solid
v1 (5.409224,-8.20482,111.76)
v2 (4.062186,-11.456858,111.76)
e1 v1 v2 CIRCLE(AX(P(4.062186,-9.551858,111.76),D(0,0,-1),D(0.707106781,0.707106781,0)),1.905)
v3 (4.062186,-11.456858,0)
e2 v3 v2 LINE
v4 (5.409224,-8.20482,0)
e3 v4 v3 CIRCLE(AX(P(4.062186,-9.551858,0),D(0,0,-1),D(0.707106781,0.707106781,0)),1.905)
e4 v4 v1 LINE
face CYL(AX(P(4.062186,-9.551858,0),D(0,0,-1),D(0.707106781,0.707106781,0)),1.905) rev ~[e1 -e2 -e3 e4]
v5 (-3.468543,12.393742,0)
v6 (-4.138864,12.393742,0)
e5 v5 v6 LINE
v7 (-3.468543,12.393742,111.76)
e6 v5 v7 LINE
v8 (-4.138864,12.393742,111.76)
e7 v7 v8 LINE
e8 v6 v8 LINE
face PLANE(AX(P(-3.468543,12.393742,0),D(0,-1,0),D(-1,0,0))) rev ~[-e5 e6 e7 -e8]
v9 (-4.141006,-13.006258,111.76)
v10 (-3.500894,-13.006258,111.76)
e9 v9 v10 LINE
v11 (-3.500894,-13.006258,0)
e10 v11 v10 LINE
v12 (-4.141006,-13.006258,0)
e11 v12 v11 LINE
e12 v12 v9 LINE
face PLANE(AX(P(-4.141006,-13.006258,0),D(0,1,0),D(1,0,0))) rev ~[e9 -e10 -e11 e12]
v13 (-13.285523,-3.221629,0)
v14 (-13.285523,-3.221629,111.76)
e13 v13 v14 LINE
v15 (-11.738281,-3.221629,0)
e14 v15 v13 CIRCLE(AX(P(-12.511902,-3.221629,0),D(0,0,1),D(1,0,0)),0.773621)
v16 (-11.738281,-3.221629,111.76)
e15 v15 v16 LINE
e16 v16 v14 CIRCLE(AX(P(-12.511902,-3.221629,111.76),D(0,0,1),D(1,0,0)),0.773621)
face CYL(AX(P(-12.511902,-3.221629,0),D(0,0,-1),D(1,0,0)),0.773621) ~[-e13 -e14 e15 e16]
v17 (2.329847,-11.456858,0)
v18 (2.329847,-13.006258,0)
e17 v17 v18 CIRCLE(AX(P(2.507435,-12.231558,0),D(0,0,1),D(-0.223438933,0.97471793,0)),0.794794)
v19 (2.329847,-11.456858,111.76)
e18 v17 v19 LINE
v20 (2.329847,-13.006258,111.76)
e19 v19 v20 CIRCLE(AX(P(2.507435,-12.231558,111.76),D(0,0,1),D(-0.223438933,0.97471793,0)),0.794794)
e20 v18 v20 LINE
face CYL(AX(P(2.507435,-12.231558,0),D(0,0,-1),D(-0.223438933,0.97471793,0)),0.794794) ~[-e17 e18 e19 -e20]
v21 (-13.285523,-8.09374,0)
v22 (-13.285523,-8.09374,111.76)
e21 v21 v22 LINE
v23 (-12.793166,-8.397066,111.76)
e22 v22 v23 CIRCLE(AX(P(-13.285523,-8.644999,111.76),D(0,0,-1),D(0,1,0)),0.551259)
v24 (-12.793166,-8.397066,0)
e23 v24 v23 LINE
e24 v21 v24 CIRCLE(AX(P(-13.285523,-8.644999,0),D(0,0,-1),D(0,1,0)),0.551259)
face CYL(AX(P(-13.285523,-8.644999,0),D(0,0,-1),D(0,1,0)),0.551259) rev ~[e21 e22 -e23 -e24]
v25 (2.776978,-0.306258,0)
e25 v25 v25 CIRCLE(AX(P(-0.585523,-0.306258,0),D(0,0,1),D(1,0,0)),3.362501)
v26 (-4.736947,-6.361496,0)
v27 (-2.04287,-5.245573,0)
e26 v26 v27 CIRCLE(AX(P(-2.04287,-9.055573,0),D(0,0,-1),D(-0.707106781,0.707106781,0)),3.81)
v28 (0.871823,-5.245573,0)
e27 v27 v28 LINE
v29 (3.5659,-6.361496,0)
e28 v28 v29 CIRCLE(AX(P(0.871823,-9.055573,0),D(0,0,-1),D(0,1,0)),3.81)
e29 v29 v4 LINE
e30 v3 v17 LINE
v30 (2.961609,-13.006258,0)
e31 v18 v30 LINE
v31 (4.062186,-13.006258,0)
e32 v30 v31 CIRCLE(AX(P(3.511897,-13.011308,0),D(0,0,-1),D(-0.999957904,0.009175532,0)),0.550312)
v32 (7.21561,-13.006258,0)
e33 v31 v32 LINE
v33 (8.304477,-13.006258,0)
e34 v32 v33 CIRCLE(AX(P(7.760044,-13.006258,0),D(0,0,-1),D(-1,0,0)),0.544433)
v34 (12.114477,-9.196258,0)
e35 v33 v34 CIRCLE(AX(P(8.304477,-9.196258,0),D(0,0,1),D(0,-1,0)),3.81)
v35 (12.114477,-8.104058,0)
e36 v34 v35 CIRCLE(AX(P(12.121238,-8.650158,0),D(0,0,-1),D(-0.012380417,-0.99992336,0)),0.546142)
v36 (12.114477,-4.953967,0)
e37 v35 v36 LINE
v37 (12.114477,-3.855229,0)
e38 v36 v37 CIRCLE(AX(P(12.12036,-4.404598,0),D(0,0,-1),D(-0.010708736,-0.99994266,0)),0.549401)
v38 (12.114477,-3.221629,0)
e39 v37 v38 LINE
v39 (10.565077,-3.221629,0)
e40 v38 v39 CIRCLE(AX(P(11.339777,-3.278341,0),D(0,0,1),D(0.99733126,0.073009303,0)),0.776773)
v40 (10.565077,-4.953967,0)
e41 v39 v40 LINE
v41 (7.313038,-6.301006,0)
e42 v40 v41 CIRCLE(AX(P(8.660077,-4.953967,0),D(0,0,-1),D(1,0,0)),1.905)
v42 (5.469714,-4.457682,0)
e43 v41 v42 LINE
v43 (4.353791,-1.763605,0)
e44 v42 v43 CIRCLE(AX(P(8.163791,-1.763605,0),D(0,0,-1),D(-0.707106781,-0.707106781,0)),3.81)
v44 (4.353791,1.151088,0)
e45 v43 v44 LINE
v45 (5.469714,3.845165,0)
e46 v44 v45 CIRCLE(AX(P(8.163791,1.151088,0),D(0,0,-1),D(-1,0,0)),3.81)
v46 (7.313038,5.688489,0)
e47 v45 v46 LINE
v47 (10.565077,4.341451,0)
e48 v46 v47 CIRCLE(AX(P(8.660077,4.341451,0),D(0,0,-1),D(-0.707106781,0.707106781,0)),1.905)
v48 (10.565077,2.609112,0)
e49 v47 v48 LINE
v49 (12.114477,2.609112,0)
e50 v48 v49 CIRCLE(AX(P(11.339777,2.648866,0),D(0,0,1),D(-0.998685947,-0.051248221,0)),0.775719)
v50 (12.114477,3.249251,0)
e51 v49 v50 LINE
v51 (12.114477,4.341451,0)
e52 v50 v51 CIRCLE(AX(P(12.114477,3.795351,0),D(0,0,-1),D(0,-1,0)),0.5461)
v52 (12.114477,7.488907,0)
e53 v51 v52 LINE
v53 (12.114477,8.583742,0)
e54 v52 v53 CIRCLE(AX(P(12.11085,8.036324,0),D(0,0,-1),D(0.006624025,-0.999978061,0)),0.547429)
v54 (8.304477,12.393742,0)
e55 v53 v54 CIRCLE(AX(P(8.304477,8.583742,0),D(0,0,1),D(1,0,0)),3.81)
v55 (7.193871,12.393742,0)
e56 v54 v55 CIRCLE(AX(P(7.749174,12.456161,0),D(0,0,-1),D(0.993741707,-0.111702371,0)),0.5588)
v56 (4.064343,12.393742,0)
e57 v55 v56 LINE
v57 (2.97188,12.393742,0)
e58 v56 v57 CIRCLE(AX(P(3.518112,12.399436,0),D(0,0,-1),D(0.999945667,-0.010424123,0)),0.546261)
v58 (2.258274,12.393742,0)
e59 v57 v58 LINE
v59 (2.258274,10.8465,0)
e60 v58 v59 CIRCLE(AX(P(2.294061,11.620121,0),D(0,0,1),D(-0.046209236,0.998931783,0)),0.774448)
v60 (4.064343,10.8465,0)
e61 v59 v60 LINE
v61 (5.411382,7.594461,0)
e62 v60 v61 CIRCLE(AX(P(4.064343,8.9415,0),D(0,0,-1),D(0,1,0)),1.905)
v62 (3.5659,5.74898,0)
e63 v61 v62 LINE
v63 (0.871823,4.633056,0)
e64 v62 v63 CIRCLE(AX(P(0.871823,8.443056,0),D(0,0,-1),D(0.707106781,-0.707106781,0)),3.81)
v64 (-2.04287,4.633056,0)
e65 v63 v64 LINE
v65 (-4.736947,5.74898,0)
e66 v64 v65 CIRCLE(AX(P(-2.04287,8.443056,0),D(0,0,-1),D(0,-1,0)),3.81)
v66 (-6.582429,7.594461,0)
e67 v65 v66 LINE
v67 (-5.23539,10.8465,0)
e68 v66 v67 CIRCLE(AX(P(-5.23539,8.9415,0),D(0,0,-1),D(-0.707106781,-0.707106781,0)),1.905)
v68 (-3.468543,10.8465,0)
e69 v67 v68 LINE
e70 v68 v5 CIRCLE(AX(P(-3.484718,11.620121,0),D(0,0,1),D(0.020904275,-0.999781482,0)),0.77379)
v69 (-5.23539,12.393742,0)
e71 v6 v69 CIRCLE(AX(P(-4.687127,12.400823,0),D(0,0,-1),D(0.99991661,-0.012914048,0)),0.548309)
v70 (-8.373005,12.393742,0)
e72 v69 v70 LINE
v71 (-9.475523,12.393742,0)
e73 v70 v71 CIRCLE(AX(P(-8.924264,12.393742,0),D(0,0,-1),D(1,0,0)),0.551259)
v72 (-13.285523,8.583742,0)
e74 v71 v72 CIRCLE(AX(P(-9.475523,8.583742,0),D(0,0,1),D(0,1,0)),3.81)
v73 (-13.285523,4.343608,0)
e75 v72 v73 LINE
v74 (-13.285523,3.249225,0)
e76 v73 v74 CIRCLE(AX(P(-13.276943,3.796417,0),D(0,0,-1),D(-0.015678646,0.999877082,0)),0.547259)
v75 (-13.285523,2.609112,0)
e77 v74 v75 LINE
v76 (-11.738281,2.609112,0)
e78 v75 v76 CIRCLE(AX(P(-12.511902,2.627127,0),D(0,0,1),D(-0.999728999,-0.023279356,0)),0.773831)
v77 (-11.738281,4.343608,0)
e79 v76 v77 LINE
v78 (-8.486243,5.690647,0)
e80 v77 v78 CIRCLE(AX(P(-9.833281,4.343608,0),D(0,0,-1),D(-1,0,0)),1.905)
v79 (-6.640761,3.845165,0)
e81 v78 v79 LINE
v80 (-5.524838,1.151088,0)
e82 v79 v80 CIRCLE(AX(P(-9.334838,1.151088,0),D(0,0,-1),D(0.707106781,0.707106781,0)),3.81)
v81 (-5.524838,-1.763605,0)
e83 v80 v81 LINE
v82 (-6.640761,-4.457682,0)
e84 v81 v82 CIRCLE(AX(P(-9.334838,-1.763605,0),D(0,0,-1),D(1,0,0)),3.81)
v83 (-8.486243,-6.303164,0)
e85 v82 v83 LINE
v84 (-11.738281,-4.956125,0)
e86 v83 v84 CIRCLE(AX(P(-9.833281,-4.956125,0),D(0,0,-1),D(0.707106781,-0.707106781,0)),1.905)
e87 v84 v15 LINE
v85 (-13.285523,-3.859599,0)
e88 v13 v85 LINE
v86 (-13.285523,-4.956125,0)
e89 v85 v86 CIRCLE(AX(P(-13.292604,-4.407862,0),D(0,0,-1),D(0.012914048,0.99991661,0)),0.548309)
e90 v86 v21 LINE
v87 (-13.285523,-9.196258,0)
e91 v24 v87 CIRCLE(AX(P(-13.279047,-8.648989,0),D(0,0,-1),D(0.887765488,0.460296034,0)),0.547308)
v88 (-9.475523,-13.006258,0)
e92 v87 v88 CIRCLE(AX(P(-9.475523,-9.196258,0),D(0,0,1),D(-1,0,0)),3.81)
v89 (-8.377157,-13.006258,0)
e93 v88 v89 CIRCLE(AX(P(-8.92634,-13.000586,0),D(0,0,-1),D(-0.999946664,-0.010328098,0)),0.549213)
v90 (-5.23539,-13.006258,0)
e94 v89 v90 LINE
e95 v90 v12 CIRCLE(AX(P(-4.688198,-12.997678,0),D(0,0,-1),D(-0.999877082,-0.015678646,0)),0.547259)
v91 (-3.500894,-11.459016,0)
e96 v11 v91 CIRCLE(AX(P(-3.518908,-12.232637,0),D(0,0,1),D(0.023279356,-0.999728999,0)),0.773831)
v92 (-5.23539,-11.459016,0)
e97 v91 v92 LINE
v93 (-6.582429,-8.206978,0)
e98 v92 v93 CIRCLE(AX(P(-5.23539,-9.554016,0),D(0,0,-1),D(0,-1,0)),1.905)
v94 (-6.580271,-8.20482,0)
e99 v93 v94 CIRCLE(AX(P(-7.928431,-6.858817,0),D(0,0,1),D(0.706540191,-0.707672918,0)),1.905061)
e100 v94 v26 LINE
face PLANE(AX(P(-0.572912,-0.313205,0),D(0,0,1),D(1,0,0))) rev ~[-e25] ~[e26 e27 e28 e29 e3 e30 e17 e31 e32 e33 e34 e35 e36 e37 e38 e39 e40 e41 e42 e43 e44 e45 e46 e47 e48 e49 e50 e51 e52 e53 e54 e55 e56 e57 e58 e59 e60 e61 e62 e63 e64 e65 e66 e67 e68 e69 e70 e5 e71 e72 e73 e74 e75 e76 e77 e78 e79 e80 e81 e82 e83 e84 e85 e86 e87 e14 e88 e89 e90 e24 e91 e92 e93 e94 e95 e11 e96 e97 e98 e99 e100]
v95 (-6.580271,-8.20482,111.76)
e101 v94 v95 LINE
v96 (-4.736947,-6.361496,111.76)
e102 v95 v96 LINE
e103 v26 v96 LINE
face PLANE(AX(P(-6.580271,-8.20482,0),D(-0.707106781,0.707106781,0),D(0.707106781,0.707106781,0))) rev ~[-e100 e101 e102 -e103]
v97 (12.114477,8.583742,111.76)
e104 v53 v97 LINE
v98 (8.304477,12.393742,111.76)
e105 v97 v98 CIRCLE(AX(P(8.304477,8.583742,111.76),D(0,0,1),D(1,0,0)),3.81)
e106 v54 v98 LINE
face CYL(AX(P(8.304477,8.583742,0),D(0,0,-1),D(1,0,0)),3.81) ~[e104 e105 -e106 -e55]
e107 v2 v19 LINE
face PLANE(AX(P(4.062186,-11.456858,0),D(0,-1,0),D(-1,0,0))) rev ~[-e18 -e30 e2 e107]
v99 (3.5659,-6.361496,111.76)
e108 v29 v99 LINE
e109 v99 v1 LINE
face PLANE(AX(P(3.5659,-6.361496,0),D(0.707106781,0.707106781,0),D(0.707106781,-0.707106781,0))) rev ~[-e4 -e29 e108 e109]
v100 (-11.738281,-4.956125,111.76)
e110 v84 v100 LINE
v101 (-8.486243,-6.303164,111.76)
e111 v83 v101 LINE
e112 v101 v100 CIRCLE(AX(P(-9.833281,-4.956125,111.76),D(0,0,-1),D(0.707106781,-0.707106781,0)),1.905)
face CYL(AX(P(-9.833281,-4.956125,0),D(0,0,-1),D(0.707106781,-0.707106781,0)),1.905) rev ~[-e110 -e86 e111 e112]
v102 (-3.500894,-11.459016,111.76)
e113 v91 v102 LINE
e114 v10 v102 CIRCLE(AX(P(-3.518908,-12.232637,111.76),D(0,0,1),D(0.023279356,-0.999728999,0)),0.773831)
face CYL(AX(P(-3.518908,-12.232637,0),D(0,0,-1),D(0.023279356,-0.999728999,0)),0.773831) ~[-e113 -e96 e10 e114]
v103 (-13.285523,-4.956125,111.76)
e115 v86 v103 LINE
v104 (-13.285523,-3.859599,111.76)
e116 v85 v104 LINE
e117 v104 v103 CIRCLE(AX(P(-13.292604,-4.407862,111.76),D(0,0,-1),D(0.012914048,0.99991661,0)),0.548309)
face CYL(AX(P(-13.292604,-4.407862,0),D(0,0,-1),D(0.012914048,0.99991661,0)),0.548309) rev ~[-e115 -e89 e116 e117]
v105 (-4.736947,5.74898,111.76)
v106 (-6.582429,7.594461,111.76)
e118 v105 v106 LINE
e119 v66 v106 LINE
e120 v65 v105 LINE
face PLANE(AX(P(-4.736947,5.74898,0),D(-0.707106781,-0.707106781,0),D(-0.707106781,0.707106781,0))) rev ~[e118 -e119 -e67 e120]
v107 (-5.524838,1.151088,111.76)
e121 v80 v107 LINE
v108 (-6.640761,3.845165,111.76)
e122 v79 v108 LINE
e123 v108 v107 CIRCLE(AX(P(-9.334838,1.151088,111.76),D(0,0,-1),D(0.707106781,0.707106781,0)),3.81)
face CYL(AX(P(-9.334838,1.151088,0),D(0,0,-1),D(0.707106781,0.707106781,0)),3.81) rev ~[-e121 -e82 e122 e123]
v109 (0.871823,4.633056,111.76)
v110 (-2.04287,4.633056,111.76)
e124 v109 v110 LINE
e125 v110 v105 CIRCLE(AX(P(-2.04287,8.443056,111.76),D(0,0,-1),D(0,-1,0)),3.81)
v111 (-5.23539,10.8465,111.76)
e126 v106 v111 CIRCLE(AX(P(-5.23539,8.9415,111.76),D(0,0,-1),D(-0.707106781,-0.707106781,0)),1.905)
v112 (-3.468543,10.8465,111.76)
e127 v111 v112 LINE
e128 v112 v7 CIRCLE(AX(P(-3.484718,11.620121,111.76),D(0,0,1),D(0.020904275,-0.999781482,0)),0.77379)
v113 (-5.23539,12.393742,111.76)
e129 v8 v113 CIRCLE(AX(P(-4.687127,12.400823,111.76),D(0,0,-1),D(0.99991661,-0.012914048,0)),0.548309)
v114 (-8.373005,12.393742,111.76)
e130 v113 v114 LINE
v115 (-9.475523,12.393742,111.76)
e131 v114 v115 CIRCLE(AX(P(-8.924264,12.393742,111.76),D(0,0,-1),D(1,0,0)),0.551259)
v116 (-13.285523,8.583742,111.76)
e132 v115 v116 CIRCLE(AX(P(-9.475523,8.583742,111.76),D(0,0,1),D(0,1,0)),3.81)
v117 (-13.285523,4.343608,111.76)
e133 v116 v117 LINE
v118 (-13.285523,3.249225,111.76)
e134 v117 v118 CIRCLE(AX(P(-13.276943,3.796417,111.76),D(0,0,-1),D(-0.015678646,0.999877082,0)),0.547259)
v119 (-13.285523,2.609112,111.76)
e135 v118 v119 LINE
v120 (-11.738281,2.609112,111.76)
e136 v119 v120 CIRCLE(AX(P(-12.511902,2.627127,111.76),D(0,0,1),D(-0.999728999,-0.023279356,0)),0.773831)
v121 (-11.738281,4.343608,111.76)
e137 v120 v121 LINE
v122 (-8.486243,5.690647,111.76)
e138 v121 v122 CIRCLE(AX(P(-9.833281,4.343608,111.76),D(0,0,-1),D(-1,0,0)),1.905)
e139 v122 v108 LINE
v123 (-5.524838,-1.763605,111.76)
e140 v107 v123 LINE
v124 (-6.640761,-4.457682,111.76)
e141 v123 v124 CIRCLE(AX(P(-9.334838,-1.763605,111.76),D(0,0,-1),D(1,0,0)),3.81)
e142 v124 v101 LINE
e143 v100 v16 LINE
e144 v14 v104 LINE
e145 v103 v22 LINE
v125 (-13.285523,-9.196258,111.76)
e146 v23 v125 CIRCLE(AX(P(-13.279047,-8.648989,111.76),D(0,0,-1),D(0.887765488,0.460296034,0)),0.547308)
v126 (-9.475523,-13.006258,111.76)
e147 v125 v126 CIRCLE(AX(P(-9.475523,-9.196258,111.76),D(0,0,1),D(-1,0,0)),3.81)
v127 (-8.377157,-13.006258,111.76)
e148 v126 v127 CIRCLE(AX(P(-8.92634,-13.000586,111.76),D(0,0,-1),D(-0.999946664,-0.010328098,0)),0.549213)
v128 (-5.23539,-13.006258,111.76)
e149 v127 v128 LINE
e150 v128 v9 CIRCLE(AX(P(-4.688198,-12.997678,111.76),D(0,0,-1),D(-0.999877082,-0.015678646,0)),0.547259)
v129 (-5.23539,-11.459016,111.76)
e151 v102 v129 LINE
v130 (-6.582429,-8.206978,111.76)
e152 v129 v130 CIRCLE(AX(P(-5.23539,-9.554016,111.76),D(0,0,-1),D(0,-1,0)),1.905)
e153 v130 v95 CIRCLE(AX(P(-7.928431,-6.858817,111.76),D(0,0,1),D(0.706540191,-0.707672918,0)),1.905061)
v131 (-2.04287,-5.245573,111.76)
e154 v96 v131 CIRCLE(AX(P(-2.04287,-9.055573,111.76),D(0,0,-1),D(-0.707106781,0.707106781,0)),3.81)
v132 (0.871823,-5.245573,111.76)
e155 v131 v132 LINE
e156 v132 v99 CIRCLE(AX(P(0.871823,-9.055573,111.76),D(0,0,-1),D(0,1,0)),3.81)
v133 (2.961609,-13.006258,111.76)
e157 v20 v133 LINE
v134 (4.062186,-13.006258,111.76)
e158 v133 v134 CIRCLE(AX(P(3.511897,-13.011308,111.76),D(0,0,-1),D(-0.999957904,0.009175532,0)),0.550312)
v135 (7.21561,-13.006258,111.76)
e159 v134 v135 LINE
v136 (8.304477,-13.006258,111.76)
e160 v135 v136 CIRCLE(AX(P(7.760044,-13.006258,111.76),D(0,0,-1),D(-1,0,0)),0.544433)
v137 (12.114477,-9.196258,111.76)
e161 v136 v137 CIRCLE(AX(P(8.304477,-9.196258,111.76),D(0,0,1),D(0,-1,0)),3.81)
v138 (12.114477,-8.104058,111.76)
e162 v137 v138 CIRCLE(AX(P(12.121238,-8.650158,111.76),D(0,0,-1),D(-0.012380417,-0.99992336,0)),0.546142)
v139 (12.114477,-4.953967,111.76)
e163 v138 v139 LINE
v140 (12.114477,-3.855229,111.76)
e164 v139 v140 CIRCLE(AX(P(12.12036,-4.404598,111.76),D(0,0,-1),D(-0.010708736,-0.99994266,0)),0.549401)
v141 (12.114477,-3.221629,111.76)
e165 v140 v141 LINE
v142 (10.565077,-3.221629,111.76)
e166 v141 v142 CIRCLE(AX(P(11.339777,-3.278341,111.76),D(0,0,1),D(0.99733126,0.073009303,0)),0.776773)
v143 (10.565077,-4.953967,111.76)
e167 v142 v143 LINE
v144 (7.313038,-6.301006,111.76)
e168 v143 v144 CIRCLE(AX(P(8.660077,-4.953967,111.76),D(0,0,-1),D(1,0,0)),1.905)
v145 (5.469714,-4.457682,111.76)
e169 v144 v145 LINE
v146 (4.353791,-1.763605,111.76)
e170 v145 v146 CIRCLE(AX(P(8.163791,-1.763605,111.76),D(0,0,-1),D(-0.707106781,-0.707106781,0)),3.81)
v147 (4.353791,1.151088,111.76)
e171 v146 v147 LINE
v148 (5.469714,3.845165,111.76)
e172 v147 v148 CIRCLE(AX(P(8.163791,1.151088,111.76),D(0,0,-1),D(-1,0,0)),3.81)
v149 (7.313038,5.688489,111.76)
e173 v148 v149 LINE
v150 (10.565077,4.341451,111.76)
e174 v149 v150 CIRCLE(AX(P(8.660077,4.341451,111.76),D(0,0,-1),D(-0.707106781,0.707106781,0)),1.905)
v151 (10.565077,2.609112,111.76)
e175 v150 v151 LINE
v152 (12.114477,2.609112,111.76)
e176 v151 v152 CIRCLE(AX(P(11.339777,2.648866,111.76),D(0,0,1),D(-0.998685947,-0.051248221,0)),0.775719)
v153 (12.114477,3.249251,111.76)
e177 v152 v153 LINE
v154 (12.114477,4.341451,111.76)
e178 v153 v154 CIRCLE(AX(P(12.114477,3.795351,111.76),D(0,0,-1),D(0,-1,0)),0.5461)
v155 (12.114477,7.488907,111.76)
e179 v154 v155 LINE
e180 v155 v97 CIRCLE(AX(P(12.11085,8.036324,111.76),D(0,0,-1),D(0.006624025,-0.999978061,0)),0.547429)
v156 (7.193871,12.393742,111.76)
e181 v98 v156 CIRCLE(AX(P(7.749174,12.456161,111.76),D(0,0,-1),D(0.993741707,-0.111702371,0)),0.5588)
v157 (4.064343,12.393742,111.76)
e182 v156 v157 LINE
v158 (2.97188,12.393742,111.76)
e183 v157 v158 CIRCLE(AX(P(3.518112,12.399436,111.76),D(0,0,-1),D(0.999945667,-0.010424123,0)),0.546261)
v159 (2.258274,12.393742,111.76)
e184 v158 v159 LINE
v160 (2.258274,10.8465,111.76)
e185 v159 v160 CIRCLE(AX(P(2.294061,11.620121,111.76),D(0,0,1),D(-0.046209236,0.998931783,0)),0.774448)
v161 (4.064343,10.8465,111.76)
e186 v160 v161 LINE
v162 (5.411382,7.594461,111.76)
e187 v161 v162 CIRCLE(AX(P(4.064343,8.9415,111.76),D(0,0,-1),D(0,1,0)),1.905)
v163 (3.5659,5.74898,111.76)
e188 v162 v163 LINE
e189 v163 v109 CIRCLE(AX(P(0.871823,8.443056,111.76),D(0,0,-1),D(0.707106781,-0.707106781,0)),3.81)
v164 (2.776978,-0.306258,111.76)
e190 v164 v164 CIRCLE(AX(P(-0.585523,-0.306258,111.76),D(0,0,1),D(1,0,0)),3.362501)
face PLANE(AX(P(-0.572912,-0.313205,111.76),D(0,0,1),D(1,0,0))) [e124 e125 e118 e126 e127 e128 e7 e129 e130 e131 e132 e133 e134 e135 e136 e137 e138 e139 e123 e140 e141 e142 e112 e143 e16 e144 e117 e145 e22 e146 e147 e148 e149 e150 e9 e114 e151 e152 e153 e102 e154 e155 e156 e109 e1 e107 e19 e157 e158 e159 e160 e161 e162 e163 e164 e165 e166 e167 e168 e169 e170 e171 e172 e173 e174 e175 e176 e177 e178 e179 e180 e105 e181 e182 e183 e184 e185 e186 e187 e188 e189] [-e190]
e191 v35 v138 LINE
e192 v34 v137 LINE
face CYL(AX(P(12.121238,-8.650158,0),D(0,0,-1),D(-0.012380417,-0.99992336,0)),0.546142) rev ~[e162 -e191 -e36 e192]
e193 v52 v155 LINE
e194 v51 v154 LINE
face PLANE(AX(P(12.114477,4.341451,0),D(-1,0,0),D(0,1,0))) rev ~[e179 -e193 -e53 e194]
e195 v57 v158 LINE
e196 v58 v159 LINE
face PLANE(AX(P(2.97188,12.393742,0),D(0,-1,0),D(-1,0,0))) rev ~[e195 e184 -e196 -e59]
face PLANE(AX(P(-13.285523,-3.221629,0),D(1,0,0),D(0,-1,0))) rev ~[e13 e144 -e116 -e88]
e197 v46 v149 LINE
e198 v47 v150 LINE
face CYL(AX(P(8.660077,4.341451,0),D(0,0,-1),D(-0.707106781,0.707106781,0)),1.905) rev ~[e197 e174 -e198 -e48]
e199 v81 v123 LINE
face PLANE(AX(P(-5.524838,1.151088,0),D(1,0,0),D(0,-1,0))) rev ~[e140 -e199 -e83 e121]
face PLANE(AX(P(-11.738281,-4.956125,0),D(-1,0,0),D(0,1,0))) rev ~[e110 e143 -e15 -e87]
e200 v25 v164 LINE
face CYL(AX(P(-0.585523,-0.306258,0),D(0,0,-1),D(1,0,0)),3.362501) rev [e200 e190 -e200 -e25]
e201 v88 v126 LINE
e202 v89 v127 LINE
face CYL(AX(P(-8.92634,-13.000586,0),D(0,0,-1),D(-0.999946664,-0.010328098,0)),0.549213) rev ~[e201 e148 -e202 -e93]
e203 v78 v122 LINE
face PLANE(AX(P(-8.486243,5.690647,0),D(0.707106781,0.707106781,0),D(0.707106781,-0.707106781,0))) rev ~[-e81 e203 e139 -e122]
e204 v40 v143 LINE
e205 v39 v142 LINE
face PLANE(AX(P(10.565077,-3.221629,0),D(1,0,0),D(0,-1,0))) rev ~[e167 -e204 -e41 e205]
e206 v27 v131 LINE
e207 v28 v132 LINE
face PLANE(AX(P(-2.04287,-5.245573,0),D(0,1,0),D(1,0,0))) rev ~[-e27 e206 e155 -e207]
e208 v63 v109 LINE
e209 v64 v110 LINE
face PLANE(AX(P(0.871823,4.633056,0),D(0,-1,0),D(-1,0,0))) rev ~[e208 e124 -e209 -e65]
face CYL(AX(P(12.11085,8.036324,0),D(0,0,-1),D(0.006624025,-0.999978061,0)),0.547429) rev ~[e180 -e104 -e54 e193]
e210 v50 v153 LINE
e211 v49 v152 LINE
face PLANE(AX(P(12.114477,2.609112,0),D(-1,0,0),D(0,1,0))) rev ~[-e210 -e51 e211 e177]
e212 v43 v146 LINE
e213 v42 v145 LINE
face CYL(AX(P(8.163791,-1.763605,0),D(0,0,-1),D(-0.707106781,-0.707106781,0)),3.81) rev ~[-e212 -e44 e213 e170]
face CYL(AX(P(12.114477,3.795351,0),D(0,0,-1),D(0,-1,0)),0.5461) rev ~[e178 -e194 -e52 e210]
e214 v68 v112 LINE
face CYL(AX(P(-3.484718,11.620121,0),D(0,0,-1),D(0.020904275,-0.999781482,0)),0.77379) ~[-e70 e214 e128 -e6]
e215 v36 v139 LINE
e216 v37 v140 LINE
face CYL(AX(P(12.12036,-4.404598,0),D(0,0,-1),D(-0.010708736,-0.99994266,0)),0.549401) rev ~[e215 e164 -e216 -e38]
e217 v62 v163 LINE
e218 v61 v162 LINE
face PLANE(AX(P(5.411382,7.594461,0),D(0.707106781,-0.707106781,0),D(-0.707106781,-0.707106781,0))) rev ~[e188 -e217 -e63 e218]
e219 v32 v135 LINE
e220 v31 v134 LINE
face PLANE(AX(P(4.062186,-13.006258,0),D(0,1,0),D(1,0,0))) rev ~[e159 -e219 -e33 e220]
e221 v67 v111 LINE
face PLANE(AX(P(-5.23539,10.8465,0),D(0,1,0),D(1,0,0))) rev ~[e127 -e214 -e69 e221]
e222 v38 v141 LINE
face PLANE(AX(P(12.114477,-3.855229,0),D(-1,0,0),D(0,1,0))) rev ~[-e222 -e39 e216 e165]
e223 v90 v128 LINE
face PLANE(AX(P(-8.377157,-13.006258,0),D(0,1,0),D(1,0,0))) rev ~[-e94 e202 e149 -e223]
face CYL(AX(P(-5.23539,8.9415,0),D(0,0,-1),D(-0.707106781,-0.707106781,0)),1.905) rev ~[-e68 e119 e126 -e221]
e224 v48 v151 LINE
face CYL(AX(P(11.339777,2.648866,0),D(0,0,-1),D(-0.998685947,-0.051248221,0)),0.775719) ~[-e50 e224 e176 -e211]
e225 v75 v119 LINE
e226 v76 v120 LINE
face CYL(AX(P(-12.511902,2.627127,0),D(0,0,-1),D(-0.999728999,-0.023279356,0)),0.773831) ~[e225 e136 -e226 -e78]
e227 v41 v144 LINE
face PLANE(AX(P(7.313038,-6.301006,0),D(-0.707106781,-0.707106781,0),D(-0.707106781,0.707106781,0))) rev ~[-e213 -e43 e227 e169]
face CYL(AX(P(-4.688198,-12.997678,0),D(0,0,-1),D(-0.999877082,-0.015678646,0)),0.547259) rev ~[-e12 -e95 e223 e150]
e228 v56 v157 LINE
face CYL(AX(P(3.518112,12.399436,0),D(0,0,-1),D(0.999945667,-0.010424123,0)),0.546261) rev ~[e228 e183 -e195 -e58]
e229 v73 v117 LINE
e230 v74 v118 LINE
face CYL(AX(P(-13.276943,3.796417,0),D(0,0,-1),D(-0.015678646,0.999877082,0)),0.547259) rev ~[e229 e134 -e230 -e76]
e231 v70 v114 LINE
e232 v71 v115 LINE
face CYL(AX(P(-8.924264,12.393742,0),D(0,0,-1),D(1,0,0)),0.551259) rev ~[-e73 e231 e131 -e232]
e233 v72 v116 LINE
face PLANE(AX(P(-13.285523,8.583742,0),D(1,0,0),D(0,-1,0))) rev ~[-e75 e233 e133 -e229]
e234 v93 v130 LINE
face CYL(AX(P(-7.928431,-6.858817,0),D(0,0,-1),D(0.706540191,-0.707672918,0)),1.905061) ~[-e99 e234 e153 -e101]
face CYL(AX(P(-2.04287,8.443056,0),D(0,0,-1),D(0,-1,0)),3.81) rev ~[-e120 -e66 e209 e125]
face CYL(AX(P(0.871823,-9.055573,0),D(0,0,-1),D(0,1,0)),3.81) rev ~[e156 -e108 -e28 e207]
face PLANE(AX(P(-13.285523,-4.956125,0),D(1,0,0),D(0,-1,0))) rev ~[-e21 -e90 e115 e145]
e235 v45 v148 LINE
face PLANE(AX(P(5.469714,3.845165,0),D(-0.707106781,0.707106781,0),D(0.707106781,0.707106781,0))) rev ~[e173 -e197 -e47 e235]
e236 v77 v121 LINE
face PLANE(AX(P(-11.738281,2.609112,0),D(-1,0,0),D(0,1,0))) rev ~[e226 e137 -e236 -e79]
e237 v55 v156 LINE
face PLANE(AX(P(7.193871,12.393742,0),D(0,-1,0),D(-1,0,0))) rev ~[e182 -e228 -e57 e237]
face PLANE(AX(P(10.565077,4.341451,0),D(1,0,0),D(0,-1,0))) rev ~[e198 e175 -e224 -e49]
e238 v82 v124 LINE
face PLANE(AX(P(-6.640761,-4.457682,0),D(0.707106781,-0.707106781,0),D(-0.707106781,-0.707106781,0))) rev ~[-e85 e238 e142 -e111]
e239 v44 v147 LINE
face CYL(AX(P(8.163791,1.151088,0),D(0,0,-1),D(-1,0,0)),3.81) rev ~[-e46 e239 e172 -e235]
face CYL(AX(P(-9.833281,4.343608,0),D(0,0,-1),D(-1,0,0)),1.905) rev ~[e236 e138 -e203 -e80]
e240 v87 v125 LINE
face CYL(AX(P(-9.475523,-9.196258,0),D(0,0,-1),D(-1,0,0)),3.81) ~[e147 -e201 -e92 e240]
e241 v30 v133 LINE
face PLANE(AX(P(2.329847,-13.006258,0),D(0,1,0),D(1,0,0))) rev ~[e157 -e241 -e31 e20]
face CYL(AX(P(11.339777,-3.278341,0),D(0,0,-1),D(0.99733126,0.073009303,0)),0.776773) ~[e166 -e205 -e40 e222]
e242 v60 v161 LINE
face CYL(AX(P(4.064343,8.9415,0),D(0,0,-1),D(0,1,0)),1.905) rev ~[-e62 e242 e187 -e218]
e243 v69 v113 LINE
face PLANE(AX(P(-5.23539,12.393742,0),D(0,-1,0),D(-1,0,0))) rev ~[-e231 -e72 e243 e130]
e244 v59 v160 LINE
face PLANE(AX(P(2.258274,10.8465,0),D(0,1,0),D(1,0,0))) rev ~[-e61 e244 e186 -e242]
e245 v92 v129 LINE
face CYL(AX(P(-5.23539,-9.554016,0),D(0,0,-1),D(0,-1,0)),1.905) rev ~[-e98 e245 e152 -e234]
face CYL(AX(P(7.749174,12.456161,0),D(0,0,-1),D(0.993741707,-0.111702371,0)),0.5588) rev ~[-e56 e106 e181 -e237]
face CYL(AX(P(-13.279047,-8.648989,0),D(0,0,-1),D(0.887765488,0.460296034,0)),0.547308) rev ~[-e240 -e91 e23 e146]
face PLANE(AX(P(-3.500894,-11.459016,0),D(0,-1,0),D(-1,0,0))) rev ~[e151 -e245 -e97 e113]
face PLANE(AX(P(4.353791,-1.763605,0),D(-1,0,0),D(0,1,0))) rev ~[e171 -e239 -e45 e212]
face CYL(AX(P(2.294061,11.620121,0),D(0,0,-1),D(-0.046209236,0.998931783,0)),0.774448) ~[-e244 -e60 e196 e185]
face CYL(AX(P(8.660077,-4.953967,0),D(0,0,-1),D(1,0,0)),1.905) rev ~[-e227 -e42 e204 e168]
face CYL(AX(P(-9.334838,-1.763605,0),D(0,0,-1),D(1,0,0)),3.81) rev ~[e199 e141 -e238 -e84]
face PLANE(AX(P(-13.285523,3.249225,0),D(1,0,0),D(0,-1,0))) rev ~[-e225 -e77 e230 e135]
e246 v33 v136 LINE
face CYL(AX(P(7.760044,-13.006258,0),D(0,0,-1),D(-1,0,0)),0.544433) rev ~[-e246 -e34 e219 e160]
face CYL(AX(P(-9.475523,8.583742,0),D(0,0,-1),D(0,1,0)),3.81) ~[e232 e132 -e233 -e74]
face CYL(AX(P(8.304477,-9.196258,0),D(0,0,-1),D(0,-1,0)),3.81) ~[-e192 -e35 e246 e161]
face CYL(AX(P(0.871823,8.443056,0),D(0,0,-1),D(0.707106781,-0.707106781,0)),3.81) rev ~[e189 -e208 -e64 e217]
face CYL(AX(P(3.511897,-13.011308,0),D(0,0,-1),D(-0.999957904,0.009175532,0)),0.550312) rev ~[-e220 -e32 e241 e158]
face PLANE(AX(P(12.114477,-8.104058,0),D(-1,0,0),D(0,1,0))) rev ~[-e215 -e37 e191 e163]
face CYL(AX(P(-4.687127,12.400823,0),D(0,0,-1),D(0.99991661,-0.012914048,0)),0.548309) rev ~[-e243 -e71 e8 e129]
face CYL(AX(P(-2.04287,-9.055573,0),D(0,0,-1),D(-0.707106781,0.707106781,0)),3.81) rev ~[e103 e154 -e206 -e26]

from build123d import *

# Parameters (mm, degrees)
F0_R     = 3.3625011168
F1_DEPTH = 111.76


# Not quite as in the source:
# - ends of sketch curves that miss each other by under 0.0002 mm in the source are joined


with BuildPart() as f1:
    # F0 (on Top) → F1 (new body)
    with BuildSketch(Plane.XY):
        with BuildLine():
            ThreePointArc((3.5659002011, 5.7489795053), (2.3298472421, 4.9230753228), (0.8718233648, 4.6330563417))
            Line((0.8718233648, 4.6330563417), (-2.0428700475, 4.6330563417))
            ThreePointArc((-2.0428700475, 4.6330563417), (-3.5008939248, 4.9230753228), (-4.7369468838, 5.7489795053))
            Line((-4.7369468838, 5.7489795053), (-6.5824285393, 7.5944611609))
            ThreePointArc((-6.5824285393, 7.5944611609), (-6.9953806306, 9.6705115177), (-5.2353901211, 10.846499579))
            Line((-5.2353901211, 10.846499579), (-3.5008939248, 10.846499579))
            Line((-3.5008939248, 10.846499579), (-3.4685428807, 10.846499579))
            ThreePointArc((-3.4685428807, 10.846499579), (-2.7109282724, 11.6201206221), (-3.4685428807, 12.3937416652))
            Line((-3.4685428807, 12.3937416652), (-3.5008939248, 12.3937416652))
            Line((-3.5008939248, 12.3937416652), (-4.1388643307, 12.3937416652))
            ThreePointArc((-4.1388643307, 12.3937416652), (-4.6871272259, 11.8525139305), (-5.2353901211, 12.3937416652))
            Line((-5.2353901211, 12.3937416652), (-8.3730050695, 12.3937416652))
            ThreePointArc((-8.3730050695, 12.3937416652), (-8.9242642054, 11.8424825293), (-9.4755233413, 12.3937416652))
            ThreePointArc((-9.4755233413, 12.3937416652), (-12.1696001777, 11.2778185015), (-13.2855233413, 8.5837416652))
            Line((-13.2855233413, 8.5837416652), (-13.2855233413, 7.4984658996))
            Line((-13.2855233413, 7.4984658996), (-13.2855233413, 4.343608445))
            ThreePointArc((-13.2855233413, 4.343608445), (-12.7296839168, 3.7964165708), (-13.2855233413, 3.2492246965))
            Line((-13.2855233413, 3.2492246965), (-13.2855233413, 2.6091122487))
            ThreePointArc((-13.2855233413, 2.6091122487), (-12.5119022982, 1.8532957784), (-11.7382812551, 2.6091122487))
            Line((-11.7382812551, 2.6091122487), (-11.7382812551, 4.343608445))
            ThreePointArc((-11.7382812551, 4.343608445), (-10.5622931938, 6.1035989545), (-8.486242837, 5.6906468632))
            Line((-8.486242837, 5.6906468632), (-6.6407611815, 3.8451652077))
            ThreePointArc((-6.6407611815, 3.8451652077), (-5.8148569989, 2.6091122487), (-5.5248380178, 1.1510883714))
            Line((-5.5248380178, 1.1510883714), (-5.5248380178, -1.7636050409))
            ThreePointArc((-5.5248380178, -1.7636050409), (-5.8148569989, -3.2216289182), (-6.6407611815, -4.4576818772))
            Line((-6.6407611815, -4.4576818772), (-8.486242837, -6.3031635328))
            ThreePointArc((-8.486242837, -6.3031635328), (-10.5622931938, -6.716115624), (-11.7382812551, -4.9561251146))
            Line((-11.7382812551, -4.9561251146), (-11.7382812551, -3.2216289182))
            ThreePointArc((-11.7382812551, -3.2216289182), (-12.5119022982, -2.4480078751), (-13.2855233413, -3.2216289182))
            Line((-13.2855233413, -3.2216289182), (-13.2855233413, -3.8570189362))
            Line((-13.2855233413, -3.8570189362), (-13.2855233413, -3.8595993241))
            ThreePointArc((-13.2855233413, -3.8595993241), (-12.7442956066, -4.4078622194), (-13.2855233413, -4.9561251146))
            Line((-13.2855233413, -4.9561251146), (-13.2855233413, -8.093740063))
            ThreePointArc((-13.2855233413, -8.093740063), (-12.9963771793, -8.175658031), (-12.7931661592, -8.3970656592))
            ThreePointArc((-12.7931661592, -8.3970656592), (-12.8130701183, -8.9360625991), (-13.2855233413, -9.1962583348))
            ThreePointArc((-13.2855233413, -9.1962583348), (-12.1696001777, -11.8903351711), (-9.4755233413, -13.0062583348))
            ThreePointArc((-9.4755233413, -13.0062583348), (-8.9263401234, -12.4513735034), (-8.3771569056, -13.0062583348))
            Line((-8.3771569056, -13.0062583348), (-5.2353901211, -13.0062583348))
            ThreePointArc((-5.2353901211, -13.0062583348), (-4.6881982469, -12.4504189103), (-4.1410063726, -13.0062583348))
            Line((-4.1410063726, -13.0062583348), (-3.5008939248, -13.0062583348))
            ThreePointArc((-3.5008939248, -13.0062583348), (-2.7450774545, -12.2326372917), (-3.5008939248, -11.4590162486))
            Line((-3.5008939248, -11.4590162486), (-5.2353901211, -11.4590162486))
            ThreePointArc((-5.2353901211, -11.4590162486), (-6.9953806306, -10.2830281872), (-6.5824285393, -8.2069778304))
            ThreePointArc((-6.5824285393, -8.2069778304), (-6.5813491493, -8.2058993046), (-6.5802706255, -8.2048199166))
            Line((-6.5802706255, -8.2048199166), (-4.7369468838, -6.3614961749))
            ThreePointArc((-4.7369468838, -6.3614961749), (-3.5008939248, -5.5355919924), (-2.0428700475, -5.2455730112))
            Line((-2.0428700475, -5.2455730112), (0.8718233648, -5.2455730112))
            ThreePointArc((0.8718233648, -5.2455730112), (2.3298472421, -5.5355919924), (3.5659002011, -6.3614961749))
            Line((3.5659002011, -6.3614961749), (5.4092239428, -8.2048199166))
            ThreePointArc((5.4092239428, -8.2048199166), (5.8221760341, -10.2808702734), (4.0621855247, -11.4568583348))
            Line((4.0621855247, -11.4568583348), (2.3298472421, -11.4568583348))
            ThreePointArc((2.3298472421, -11.4568583348), (1.7126411358, -12.2315583348), (2.3298472421, -13.0062583348))
            Line((2.3298472421, -13.0062583348), (2.9616088274, -13.0062583348))
            ThreePointArc((2.9616088274, -13.0062583348), (3.511897176, -12.460996221), (4.0621855247, -13.0062583348))
            Line((4.0621855247, -13.0062583348), (7.2156104858, -13.0062583348))
            ThreePointArc((7.2156104858, -13.0062583348), (7.7600435722, -12.4618252483), (8.3044766587, -13.0062583348))
            ThreePointArc((8.3044766587, -13.0062583348), (10.998553495, -11.8903351711), (12.1144766587, -9.1962583348))
            ThreePointArc((12.1144766587, -9.1962583348), (11.5750962663, -8.6501583348), (12.1144766587, -8.1040583348))
            Line((12.1144766587, -8.1040583348), (12.1144766587, -4.9539672008))
            ThreePointArc((12.1144766587, -4.9539672008), (11.570959409, -4.4045980675), (12.1144766587, -3.8552289343))
            Line((12.1144766587, -3.8552289343), (12.1144766587, -3.2216289182))
            ThreePointArc((12.1144766587, -3.2216289182), (11.3397766587, -2.5015675684), (10.5650766587, -3.2216289182))
            Line((10.5650766587, -3.2216289182), (10.5650766587, -4.9539672008))
            ThreePointArc((10.5650766587, -4.9539672008), (9.3890885973, -6.7139577102), (7.3130382405, -6.301005619))
            Line((7.3130382405, -6.301005619), (5.4697144988, -4.4576818772))
            ThreePointArc((5.4697144988, -4.4576818772), (4.6438103163, -3.2216289182), (4.3537913351, -1.7636050409))
            Line((4.3537913351, -1.7636050409), (4.3537913351, 1.1510883714))
            ThreePointArc((4.3537913351, 1.1510883714), (4.6438103163, 2.6091122487), (5.4697144988, 3.8451652077))
            Line((5.4697144988, 3.8451652077), (7.3130382405, 5.6884889494))
            ThreePointArc((7.3130382405, 5.6884889494), (9.3890885973, 6.1014410407), (10.5650766587, 4.3414505312))
            Line((10.5650766587, 4.3414505312), (10.5650766587, 2.6091122487))
            ThreePointArc((10.5650766587, 2.6091122487), (11.3397766587, 1.8731471479), (12.1144766587, 2.6091122487))
            Line((12.1144766587, 2.6091122487), (12.1144766587, 3.2492505312))
            ThreePointArc((12.1144766587, 3.2492505312), (11.5683766587, 3.7953505312), (12.1144766587, 4.3414505312))
            Line((12.1144766587, 4.3414505312), (12.1144766587, 7.4889068047))
            ThreePointArc((12.1144766587, 7.4889068047), (11.563421032, 8.0363242349), (12.1144766587, 8.5837416652))
            ThreePointArc((12.1144766587, 8.5837416652), (10.998553495, 11.2778185015), (8.3044766587, 12.3937416652))
            ThreePointArc((8.3044766587, 12.3937416652), (7.7491737928, 11.89736095), (7.1938709268, 12.3937416652))
            Line((7.1938709268, 12.3937416652), (4.0643434385, 12.3937416652))
            ThreePointArc((4.0643434385, 12.3937416652), (3.5181119113, 11.8531747523), (2.9718803841, 12.3937416652))
            Line((2.9718803841, 12.3937416652), (2.3298472421, 12.3937416652))
            Line((2.3298472421, 12.3937416652), (2.2582739116, 12.3937416652))
            ThreePointArc((2.2582739116, 12.3937416652), (1.5196122547, 11.6201206221), (2.2582739116, 10.846499579))
            Line((2.2582739116, 10.846499579), (2.3298472421, 10.846499579))
            Line((2.3298472421, 10.846499579), (4.0643434385, 10.846499579))
            ThreePointArc((4.0643434385, 10.846499579), (5.8243339479, 9.6705115177), (5.4113818566, 7.5944611609))
            Line((5.4113818566, 7.5944611609), (3.5659002011, 5.7489795053))
        make_face()
        with Locations((-0.5855233413, -0.3062583348)):
            Circle(F0_R, mode=Mode.SUBTRACT)
    extrude(amount=F1_DEPTH)


solid = f1.part
